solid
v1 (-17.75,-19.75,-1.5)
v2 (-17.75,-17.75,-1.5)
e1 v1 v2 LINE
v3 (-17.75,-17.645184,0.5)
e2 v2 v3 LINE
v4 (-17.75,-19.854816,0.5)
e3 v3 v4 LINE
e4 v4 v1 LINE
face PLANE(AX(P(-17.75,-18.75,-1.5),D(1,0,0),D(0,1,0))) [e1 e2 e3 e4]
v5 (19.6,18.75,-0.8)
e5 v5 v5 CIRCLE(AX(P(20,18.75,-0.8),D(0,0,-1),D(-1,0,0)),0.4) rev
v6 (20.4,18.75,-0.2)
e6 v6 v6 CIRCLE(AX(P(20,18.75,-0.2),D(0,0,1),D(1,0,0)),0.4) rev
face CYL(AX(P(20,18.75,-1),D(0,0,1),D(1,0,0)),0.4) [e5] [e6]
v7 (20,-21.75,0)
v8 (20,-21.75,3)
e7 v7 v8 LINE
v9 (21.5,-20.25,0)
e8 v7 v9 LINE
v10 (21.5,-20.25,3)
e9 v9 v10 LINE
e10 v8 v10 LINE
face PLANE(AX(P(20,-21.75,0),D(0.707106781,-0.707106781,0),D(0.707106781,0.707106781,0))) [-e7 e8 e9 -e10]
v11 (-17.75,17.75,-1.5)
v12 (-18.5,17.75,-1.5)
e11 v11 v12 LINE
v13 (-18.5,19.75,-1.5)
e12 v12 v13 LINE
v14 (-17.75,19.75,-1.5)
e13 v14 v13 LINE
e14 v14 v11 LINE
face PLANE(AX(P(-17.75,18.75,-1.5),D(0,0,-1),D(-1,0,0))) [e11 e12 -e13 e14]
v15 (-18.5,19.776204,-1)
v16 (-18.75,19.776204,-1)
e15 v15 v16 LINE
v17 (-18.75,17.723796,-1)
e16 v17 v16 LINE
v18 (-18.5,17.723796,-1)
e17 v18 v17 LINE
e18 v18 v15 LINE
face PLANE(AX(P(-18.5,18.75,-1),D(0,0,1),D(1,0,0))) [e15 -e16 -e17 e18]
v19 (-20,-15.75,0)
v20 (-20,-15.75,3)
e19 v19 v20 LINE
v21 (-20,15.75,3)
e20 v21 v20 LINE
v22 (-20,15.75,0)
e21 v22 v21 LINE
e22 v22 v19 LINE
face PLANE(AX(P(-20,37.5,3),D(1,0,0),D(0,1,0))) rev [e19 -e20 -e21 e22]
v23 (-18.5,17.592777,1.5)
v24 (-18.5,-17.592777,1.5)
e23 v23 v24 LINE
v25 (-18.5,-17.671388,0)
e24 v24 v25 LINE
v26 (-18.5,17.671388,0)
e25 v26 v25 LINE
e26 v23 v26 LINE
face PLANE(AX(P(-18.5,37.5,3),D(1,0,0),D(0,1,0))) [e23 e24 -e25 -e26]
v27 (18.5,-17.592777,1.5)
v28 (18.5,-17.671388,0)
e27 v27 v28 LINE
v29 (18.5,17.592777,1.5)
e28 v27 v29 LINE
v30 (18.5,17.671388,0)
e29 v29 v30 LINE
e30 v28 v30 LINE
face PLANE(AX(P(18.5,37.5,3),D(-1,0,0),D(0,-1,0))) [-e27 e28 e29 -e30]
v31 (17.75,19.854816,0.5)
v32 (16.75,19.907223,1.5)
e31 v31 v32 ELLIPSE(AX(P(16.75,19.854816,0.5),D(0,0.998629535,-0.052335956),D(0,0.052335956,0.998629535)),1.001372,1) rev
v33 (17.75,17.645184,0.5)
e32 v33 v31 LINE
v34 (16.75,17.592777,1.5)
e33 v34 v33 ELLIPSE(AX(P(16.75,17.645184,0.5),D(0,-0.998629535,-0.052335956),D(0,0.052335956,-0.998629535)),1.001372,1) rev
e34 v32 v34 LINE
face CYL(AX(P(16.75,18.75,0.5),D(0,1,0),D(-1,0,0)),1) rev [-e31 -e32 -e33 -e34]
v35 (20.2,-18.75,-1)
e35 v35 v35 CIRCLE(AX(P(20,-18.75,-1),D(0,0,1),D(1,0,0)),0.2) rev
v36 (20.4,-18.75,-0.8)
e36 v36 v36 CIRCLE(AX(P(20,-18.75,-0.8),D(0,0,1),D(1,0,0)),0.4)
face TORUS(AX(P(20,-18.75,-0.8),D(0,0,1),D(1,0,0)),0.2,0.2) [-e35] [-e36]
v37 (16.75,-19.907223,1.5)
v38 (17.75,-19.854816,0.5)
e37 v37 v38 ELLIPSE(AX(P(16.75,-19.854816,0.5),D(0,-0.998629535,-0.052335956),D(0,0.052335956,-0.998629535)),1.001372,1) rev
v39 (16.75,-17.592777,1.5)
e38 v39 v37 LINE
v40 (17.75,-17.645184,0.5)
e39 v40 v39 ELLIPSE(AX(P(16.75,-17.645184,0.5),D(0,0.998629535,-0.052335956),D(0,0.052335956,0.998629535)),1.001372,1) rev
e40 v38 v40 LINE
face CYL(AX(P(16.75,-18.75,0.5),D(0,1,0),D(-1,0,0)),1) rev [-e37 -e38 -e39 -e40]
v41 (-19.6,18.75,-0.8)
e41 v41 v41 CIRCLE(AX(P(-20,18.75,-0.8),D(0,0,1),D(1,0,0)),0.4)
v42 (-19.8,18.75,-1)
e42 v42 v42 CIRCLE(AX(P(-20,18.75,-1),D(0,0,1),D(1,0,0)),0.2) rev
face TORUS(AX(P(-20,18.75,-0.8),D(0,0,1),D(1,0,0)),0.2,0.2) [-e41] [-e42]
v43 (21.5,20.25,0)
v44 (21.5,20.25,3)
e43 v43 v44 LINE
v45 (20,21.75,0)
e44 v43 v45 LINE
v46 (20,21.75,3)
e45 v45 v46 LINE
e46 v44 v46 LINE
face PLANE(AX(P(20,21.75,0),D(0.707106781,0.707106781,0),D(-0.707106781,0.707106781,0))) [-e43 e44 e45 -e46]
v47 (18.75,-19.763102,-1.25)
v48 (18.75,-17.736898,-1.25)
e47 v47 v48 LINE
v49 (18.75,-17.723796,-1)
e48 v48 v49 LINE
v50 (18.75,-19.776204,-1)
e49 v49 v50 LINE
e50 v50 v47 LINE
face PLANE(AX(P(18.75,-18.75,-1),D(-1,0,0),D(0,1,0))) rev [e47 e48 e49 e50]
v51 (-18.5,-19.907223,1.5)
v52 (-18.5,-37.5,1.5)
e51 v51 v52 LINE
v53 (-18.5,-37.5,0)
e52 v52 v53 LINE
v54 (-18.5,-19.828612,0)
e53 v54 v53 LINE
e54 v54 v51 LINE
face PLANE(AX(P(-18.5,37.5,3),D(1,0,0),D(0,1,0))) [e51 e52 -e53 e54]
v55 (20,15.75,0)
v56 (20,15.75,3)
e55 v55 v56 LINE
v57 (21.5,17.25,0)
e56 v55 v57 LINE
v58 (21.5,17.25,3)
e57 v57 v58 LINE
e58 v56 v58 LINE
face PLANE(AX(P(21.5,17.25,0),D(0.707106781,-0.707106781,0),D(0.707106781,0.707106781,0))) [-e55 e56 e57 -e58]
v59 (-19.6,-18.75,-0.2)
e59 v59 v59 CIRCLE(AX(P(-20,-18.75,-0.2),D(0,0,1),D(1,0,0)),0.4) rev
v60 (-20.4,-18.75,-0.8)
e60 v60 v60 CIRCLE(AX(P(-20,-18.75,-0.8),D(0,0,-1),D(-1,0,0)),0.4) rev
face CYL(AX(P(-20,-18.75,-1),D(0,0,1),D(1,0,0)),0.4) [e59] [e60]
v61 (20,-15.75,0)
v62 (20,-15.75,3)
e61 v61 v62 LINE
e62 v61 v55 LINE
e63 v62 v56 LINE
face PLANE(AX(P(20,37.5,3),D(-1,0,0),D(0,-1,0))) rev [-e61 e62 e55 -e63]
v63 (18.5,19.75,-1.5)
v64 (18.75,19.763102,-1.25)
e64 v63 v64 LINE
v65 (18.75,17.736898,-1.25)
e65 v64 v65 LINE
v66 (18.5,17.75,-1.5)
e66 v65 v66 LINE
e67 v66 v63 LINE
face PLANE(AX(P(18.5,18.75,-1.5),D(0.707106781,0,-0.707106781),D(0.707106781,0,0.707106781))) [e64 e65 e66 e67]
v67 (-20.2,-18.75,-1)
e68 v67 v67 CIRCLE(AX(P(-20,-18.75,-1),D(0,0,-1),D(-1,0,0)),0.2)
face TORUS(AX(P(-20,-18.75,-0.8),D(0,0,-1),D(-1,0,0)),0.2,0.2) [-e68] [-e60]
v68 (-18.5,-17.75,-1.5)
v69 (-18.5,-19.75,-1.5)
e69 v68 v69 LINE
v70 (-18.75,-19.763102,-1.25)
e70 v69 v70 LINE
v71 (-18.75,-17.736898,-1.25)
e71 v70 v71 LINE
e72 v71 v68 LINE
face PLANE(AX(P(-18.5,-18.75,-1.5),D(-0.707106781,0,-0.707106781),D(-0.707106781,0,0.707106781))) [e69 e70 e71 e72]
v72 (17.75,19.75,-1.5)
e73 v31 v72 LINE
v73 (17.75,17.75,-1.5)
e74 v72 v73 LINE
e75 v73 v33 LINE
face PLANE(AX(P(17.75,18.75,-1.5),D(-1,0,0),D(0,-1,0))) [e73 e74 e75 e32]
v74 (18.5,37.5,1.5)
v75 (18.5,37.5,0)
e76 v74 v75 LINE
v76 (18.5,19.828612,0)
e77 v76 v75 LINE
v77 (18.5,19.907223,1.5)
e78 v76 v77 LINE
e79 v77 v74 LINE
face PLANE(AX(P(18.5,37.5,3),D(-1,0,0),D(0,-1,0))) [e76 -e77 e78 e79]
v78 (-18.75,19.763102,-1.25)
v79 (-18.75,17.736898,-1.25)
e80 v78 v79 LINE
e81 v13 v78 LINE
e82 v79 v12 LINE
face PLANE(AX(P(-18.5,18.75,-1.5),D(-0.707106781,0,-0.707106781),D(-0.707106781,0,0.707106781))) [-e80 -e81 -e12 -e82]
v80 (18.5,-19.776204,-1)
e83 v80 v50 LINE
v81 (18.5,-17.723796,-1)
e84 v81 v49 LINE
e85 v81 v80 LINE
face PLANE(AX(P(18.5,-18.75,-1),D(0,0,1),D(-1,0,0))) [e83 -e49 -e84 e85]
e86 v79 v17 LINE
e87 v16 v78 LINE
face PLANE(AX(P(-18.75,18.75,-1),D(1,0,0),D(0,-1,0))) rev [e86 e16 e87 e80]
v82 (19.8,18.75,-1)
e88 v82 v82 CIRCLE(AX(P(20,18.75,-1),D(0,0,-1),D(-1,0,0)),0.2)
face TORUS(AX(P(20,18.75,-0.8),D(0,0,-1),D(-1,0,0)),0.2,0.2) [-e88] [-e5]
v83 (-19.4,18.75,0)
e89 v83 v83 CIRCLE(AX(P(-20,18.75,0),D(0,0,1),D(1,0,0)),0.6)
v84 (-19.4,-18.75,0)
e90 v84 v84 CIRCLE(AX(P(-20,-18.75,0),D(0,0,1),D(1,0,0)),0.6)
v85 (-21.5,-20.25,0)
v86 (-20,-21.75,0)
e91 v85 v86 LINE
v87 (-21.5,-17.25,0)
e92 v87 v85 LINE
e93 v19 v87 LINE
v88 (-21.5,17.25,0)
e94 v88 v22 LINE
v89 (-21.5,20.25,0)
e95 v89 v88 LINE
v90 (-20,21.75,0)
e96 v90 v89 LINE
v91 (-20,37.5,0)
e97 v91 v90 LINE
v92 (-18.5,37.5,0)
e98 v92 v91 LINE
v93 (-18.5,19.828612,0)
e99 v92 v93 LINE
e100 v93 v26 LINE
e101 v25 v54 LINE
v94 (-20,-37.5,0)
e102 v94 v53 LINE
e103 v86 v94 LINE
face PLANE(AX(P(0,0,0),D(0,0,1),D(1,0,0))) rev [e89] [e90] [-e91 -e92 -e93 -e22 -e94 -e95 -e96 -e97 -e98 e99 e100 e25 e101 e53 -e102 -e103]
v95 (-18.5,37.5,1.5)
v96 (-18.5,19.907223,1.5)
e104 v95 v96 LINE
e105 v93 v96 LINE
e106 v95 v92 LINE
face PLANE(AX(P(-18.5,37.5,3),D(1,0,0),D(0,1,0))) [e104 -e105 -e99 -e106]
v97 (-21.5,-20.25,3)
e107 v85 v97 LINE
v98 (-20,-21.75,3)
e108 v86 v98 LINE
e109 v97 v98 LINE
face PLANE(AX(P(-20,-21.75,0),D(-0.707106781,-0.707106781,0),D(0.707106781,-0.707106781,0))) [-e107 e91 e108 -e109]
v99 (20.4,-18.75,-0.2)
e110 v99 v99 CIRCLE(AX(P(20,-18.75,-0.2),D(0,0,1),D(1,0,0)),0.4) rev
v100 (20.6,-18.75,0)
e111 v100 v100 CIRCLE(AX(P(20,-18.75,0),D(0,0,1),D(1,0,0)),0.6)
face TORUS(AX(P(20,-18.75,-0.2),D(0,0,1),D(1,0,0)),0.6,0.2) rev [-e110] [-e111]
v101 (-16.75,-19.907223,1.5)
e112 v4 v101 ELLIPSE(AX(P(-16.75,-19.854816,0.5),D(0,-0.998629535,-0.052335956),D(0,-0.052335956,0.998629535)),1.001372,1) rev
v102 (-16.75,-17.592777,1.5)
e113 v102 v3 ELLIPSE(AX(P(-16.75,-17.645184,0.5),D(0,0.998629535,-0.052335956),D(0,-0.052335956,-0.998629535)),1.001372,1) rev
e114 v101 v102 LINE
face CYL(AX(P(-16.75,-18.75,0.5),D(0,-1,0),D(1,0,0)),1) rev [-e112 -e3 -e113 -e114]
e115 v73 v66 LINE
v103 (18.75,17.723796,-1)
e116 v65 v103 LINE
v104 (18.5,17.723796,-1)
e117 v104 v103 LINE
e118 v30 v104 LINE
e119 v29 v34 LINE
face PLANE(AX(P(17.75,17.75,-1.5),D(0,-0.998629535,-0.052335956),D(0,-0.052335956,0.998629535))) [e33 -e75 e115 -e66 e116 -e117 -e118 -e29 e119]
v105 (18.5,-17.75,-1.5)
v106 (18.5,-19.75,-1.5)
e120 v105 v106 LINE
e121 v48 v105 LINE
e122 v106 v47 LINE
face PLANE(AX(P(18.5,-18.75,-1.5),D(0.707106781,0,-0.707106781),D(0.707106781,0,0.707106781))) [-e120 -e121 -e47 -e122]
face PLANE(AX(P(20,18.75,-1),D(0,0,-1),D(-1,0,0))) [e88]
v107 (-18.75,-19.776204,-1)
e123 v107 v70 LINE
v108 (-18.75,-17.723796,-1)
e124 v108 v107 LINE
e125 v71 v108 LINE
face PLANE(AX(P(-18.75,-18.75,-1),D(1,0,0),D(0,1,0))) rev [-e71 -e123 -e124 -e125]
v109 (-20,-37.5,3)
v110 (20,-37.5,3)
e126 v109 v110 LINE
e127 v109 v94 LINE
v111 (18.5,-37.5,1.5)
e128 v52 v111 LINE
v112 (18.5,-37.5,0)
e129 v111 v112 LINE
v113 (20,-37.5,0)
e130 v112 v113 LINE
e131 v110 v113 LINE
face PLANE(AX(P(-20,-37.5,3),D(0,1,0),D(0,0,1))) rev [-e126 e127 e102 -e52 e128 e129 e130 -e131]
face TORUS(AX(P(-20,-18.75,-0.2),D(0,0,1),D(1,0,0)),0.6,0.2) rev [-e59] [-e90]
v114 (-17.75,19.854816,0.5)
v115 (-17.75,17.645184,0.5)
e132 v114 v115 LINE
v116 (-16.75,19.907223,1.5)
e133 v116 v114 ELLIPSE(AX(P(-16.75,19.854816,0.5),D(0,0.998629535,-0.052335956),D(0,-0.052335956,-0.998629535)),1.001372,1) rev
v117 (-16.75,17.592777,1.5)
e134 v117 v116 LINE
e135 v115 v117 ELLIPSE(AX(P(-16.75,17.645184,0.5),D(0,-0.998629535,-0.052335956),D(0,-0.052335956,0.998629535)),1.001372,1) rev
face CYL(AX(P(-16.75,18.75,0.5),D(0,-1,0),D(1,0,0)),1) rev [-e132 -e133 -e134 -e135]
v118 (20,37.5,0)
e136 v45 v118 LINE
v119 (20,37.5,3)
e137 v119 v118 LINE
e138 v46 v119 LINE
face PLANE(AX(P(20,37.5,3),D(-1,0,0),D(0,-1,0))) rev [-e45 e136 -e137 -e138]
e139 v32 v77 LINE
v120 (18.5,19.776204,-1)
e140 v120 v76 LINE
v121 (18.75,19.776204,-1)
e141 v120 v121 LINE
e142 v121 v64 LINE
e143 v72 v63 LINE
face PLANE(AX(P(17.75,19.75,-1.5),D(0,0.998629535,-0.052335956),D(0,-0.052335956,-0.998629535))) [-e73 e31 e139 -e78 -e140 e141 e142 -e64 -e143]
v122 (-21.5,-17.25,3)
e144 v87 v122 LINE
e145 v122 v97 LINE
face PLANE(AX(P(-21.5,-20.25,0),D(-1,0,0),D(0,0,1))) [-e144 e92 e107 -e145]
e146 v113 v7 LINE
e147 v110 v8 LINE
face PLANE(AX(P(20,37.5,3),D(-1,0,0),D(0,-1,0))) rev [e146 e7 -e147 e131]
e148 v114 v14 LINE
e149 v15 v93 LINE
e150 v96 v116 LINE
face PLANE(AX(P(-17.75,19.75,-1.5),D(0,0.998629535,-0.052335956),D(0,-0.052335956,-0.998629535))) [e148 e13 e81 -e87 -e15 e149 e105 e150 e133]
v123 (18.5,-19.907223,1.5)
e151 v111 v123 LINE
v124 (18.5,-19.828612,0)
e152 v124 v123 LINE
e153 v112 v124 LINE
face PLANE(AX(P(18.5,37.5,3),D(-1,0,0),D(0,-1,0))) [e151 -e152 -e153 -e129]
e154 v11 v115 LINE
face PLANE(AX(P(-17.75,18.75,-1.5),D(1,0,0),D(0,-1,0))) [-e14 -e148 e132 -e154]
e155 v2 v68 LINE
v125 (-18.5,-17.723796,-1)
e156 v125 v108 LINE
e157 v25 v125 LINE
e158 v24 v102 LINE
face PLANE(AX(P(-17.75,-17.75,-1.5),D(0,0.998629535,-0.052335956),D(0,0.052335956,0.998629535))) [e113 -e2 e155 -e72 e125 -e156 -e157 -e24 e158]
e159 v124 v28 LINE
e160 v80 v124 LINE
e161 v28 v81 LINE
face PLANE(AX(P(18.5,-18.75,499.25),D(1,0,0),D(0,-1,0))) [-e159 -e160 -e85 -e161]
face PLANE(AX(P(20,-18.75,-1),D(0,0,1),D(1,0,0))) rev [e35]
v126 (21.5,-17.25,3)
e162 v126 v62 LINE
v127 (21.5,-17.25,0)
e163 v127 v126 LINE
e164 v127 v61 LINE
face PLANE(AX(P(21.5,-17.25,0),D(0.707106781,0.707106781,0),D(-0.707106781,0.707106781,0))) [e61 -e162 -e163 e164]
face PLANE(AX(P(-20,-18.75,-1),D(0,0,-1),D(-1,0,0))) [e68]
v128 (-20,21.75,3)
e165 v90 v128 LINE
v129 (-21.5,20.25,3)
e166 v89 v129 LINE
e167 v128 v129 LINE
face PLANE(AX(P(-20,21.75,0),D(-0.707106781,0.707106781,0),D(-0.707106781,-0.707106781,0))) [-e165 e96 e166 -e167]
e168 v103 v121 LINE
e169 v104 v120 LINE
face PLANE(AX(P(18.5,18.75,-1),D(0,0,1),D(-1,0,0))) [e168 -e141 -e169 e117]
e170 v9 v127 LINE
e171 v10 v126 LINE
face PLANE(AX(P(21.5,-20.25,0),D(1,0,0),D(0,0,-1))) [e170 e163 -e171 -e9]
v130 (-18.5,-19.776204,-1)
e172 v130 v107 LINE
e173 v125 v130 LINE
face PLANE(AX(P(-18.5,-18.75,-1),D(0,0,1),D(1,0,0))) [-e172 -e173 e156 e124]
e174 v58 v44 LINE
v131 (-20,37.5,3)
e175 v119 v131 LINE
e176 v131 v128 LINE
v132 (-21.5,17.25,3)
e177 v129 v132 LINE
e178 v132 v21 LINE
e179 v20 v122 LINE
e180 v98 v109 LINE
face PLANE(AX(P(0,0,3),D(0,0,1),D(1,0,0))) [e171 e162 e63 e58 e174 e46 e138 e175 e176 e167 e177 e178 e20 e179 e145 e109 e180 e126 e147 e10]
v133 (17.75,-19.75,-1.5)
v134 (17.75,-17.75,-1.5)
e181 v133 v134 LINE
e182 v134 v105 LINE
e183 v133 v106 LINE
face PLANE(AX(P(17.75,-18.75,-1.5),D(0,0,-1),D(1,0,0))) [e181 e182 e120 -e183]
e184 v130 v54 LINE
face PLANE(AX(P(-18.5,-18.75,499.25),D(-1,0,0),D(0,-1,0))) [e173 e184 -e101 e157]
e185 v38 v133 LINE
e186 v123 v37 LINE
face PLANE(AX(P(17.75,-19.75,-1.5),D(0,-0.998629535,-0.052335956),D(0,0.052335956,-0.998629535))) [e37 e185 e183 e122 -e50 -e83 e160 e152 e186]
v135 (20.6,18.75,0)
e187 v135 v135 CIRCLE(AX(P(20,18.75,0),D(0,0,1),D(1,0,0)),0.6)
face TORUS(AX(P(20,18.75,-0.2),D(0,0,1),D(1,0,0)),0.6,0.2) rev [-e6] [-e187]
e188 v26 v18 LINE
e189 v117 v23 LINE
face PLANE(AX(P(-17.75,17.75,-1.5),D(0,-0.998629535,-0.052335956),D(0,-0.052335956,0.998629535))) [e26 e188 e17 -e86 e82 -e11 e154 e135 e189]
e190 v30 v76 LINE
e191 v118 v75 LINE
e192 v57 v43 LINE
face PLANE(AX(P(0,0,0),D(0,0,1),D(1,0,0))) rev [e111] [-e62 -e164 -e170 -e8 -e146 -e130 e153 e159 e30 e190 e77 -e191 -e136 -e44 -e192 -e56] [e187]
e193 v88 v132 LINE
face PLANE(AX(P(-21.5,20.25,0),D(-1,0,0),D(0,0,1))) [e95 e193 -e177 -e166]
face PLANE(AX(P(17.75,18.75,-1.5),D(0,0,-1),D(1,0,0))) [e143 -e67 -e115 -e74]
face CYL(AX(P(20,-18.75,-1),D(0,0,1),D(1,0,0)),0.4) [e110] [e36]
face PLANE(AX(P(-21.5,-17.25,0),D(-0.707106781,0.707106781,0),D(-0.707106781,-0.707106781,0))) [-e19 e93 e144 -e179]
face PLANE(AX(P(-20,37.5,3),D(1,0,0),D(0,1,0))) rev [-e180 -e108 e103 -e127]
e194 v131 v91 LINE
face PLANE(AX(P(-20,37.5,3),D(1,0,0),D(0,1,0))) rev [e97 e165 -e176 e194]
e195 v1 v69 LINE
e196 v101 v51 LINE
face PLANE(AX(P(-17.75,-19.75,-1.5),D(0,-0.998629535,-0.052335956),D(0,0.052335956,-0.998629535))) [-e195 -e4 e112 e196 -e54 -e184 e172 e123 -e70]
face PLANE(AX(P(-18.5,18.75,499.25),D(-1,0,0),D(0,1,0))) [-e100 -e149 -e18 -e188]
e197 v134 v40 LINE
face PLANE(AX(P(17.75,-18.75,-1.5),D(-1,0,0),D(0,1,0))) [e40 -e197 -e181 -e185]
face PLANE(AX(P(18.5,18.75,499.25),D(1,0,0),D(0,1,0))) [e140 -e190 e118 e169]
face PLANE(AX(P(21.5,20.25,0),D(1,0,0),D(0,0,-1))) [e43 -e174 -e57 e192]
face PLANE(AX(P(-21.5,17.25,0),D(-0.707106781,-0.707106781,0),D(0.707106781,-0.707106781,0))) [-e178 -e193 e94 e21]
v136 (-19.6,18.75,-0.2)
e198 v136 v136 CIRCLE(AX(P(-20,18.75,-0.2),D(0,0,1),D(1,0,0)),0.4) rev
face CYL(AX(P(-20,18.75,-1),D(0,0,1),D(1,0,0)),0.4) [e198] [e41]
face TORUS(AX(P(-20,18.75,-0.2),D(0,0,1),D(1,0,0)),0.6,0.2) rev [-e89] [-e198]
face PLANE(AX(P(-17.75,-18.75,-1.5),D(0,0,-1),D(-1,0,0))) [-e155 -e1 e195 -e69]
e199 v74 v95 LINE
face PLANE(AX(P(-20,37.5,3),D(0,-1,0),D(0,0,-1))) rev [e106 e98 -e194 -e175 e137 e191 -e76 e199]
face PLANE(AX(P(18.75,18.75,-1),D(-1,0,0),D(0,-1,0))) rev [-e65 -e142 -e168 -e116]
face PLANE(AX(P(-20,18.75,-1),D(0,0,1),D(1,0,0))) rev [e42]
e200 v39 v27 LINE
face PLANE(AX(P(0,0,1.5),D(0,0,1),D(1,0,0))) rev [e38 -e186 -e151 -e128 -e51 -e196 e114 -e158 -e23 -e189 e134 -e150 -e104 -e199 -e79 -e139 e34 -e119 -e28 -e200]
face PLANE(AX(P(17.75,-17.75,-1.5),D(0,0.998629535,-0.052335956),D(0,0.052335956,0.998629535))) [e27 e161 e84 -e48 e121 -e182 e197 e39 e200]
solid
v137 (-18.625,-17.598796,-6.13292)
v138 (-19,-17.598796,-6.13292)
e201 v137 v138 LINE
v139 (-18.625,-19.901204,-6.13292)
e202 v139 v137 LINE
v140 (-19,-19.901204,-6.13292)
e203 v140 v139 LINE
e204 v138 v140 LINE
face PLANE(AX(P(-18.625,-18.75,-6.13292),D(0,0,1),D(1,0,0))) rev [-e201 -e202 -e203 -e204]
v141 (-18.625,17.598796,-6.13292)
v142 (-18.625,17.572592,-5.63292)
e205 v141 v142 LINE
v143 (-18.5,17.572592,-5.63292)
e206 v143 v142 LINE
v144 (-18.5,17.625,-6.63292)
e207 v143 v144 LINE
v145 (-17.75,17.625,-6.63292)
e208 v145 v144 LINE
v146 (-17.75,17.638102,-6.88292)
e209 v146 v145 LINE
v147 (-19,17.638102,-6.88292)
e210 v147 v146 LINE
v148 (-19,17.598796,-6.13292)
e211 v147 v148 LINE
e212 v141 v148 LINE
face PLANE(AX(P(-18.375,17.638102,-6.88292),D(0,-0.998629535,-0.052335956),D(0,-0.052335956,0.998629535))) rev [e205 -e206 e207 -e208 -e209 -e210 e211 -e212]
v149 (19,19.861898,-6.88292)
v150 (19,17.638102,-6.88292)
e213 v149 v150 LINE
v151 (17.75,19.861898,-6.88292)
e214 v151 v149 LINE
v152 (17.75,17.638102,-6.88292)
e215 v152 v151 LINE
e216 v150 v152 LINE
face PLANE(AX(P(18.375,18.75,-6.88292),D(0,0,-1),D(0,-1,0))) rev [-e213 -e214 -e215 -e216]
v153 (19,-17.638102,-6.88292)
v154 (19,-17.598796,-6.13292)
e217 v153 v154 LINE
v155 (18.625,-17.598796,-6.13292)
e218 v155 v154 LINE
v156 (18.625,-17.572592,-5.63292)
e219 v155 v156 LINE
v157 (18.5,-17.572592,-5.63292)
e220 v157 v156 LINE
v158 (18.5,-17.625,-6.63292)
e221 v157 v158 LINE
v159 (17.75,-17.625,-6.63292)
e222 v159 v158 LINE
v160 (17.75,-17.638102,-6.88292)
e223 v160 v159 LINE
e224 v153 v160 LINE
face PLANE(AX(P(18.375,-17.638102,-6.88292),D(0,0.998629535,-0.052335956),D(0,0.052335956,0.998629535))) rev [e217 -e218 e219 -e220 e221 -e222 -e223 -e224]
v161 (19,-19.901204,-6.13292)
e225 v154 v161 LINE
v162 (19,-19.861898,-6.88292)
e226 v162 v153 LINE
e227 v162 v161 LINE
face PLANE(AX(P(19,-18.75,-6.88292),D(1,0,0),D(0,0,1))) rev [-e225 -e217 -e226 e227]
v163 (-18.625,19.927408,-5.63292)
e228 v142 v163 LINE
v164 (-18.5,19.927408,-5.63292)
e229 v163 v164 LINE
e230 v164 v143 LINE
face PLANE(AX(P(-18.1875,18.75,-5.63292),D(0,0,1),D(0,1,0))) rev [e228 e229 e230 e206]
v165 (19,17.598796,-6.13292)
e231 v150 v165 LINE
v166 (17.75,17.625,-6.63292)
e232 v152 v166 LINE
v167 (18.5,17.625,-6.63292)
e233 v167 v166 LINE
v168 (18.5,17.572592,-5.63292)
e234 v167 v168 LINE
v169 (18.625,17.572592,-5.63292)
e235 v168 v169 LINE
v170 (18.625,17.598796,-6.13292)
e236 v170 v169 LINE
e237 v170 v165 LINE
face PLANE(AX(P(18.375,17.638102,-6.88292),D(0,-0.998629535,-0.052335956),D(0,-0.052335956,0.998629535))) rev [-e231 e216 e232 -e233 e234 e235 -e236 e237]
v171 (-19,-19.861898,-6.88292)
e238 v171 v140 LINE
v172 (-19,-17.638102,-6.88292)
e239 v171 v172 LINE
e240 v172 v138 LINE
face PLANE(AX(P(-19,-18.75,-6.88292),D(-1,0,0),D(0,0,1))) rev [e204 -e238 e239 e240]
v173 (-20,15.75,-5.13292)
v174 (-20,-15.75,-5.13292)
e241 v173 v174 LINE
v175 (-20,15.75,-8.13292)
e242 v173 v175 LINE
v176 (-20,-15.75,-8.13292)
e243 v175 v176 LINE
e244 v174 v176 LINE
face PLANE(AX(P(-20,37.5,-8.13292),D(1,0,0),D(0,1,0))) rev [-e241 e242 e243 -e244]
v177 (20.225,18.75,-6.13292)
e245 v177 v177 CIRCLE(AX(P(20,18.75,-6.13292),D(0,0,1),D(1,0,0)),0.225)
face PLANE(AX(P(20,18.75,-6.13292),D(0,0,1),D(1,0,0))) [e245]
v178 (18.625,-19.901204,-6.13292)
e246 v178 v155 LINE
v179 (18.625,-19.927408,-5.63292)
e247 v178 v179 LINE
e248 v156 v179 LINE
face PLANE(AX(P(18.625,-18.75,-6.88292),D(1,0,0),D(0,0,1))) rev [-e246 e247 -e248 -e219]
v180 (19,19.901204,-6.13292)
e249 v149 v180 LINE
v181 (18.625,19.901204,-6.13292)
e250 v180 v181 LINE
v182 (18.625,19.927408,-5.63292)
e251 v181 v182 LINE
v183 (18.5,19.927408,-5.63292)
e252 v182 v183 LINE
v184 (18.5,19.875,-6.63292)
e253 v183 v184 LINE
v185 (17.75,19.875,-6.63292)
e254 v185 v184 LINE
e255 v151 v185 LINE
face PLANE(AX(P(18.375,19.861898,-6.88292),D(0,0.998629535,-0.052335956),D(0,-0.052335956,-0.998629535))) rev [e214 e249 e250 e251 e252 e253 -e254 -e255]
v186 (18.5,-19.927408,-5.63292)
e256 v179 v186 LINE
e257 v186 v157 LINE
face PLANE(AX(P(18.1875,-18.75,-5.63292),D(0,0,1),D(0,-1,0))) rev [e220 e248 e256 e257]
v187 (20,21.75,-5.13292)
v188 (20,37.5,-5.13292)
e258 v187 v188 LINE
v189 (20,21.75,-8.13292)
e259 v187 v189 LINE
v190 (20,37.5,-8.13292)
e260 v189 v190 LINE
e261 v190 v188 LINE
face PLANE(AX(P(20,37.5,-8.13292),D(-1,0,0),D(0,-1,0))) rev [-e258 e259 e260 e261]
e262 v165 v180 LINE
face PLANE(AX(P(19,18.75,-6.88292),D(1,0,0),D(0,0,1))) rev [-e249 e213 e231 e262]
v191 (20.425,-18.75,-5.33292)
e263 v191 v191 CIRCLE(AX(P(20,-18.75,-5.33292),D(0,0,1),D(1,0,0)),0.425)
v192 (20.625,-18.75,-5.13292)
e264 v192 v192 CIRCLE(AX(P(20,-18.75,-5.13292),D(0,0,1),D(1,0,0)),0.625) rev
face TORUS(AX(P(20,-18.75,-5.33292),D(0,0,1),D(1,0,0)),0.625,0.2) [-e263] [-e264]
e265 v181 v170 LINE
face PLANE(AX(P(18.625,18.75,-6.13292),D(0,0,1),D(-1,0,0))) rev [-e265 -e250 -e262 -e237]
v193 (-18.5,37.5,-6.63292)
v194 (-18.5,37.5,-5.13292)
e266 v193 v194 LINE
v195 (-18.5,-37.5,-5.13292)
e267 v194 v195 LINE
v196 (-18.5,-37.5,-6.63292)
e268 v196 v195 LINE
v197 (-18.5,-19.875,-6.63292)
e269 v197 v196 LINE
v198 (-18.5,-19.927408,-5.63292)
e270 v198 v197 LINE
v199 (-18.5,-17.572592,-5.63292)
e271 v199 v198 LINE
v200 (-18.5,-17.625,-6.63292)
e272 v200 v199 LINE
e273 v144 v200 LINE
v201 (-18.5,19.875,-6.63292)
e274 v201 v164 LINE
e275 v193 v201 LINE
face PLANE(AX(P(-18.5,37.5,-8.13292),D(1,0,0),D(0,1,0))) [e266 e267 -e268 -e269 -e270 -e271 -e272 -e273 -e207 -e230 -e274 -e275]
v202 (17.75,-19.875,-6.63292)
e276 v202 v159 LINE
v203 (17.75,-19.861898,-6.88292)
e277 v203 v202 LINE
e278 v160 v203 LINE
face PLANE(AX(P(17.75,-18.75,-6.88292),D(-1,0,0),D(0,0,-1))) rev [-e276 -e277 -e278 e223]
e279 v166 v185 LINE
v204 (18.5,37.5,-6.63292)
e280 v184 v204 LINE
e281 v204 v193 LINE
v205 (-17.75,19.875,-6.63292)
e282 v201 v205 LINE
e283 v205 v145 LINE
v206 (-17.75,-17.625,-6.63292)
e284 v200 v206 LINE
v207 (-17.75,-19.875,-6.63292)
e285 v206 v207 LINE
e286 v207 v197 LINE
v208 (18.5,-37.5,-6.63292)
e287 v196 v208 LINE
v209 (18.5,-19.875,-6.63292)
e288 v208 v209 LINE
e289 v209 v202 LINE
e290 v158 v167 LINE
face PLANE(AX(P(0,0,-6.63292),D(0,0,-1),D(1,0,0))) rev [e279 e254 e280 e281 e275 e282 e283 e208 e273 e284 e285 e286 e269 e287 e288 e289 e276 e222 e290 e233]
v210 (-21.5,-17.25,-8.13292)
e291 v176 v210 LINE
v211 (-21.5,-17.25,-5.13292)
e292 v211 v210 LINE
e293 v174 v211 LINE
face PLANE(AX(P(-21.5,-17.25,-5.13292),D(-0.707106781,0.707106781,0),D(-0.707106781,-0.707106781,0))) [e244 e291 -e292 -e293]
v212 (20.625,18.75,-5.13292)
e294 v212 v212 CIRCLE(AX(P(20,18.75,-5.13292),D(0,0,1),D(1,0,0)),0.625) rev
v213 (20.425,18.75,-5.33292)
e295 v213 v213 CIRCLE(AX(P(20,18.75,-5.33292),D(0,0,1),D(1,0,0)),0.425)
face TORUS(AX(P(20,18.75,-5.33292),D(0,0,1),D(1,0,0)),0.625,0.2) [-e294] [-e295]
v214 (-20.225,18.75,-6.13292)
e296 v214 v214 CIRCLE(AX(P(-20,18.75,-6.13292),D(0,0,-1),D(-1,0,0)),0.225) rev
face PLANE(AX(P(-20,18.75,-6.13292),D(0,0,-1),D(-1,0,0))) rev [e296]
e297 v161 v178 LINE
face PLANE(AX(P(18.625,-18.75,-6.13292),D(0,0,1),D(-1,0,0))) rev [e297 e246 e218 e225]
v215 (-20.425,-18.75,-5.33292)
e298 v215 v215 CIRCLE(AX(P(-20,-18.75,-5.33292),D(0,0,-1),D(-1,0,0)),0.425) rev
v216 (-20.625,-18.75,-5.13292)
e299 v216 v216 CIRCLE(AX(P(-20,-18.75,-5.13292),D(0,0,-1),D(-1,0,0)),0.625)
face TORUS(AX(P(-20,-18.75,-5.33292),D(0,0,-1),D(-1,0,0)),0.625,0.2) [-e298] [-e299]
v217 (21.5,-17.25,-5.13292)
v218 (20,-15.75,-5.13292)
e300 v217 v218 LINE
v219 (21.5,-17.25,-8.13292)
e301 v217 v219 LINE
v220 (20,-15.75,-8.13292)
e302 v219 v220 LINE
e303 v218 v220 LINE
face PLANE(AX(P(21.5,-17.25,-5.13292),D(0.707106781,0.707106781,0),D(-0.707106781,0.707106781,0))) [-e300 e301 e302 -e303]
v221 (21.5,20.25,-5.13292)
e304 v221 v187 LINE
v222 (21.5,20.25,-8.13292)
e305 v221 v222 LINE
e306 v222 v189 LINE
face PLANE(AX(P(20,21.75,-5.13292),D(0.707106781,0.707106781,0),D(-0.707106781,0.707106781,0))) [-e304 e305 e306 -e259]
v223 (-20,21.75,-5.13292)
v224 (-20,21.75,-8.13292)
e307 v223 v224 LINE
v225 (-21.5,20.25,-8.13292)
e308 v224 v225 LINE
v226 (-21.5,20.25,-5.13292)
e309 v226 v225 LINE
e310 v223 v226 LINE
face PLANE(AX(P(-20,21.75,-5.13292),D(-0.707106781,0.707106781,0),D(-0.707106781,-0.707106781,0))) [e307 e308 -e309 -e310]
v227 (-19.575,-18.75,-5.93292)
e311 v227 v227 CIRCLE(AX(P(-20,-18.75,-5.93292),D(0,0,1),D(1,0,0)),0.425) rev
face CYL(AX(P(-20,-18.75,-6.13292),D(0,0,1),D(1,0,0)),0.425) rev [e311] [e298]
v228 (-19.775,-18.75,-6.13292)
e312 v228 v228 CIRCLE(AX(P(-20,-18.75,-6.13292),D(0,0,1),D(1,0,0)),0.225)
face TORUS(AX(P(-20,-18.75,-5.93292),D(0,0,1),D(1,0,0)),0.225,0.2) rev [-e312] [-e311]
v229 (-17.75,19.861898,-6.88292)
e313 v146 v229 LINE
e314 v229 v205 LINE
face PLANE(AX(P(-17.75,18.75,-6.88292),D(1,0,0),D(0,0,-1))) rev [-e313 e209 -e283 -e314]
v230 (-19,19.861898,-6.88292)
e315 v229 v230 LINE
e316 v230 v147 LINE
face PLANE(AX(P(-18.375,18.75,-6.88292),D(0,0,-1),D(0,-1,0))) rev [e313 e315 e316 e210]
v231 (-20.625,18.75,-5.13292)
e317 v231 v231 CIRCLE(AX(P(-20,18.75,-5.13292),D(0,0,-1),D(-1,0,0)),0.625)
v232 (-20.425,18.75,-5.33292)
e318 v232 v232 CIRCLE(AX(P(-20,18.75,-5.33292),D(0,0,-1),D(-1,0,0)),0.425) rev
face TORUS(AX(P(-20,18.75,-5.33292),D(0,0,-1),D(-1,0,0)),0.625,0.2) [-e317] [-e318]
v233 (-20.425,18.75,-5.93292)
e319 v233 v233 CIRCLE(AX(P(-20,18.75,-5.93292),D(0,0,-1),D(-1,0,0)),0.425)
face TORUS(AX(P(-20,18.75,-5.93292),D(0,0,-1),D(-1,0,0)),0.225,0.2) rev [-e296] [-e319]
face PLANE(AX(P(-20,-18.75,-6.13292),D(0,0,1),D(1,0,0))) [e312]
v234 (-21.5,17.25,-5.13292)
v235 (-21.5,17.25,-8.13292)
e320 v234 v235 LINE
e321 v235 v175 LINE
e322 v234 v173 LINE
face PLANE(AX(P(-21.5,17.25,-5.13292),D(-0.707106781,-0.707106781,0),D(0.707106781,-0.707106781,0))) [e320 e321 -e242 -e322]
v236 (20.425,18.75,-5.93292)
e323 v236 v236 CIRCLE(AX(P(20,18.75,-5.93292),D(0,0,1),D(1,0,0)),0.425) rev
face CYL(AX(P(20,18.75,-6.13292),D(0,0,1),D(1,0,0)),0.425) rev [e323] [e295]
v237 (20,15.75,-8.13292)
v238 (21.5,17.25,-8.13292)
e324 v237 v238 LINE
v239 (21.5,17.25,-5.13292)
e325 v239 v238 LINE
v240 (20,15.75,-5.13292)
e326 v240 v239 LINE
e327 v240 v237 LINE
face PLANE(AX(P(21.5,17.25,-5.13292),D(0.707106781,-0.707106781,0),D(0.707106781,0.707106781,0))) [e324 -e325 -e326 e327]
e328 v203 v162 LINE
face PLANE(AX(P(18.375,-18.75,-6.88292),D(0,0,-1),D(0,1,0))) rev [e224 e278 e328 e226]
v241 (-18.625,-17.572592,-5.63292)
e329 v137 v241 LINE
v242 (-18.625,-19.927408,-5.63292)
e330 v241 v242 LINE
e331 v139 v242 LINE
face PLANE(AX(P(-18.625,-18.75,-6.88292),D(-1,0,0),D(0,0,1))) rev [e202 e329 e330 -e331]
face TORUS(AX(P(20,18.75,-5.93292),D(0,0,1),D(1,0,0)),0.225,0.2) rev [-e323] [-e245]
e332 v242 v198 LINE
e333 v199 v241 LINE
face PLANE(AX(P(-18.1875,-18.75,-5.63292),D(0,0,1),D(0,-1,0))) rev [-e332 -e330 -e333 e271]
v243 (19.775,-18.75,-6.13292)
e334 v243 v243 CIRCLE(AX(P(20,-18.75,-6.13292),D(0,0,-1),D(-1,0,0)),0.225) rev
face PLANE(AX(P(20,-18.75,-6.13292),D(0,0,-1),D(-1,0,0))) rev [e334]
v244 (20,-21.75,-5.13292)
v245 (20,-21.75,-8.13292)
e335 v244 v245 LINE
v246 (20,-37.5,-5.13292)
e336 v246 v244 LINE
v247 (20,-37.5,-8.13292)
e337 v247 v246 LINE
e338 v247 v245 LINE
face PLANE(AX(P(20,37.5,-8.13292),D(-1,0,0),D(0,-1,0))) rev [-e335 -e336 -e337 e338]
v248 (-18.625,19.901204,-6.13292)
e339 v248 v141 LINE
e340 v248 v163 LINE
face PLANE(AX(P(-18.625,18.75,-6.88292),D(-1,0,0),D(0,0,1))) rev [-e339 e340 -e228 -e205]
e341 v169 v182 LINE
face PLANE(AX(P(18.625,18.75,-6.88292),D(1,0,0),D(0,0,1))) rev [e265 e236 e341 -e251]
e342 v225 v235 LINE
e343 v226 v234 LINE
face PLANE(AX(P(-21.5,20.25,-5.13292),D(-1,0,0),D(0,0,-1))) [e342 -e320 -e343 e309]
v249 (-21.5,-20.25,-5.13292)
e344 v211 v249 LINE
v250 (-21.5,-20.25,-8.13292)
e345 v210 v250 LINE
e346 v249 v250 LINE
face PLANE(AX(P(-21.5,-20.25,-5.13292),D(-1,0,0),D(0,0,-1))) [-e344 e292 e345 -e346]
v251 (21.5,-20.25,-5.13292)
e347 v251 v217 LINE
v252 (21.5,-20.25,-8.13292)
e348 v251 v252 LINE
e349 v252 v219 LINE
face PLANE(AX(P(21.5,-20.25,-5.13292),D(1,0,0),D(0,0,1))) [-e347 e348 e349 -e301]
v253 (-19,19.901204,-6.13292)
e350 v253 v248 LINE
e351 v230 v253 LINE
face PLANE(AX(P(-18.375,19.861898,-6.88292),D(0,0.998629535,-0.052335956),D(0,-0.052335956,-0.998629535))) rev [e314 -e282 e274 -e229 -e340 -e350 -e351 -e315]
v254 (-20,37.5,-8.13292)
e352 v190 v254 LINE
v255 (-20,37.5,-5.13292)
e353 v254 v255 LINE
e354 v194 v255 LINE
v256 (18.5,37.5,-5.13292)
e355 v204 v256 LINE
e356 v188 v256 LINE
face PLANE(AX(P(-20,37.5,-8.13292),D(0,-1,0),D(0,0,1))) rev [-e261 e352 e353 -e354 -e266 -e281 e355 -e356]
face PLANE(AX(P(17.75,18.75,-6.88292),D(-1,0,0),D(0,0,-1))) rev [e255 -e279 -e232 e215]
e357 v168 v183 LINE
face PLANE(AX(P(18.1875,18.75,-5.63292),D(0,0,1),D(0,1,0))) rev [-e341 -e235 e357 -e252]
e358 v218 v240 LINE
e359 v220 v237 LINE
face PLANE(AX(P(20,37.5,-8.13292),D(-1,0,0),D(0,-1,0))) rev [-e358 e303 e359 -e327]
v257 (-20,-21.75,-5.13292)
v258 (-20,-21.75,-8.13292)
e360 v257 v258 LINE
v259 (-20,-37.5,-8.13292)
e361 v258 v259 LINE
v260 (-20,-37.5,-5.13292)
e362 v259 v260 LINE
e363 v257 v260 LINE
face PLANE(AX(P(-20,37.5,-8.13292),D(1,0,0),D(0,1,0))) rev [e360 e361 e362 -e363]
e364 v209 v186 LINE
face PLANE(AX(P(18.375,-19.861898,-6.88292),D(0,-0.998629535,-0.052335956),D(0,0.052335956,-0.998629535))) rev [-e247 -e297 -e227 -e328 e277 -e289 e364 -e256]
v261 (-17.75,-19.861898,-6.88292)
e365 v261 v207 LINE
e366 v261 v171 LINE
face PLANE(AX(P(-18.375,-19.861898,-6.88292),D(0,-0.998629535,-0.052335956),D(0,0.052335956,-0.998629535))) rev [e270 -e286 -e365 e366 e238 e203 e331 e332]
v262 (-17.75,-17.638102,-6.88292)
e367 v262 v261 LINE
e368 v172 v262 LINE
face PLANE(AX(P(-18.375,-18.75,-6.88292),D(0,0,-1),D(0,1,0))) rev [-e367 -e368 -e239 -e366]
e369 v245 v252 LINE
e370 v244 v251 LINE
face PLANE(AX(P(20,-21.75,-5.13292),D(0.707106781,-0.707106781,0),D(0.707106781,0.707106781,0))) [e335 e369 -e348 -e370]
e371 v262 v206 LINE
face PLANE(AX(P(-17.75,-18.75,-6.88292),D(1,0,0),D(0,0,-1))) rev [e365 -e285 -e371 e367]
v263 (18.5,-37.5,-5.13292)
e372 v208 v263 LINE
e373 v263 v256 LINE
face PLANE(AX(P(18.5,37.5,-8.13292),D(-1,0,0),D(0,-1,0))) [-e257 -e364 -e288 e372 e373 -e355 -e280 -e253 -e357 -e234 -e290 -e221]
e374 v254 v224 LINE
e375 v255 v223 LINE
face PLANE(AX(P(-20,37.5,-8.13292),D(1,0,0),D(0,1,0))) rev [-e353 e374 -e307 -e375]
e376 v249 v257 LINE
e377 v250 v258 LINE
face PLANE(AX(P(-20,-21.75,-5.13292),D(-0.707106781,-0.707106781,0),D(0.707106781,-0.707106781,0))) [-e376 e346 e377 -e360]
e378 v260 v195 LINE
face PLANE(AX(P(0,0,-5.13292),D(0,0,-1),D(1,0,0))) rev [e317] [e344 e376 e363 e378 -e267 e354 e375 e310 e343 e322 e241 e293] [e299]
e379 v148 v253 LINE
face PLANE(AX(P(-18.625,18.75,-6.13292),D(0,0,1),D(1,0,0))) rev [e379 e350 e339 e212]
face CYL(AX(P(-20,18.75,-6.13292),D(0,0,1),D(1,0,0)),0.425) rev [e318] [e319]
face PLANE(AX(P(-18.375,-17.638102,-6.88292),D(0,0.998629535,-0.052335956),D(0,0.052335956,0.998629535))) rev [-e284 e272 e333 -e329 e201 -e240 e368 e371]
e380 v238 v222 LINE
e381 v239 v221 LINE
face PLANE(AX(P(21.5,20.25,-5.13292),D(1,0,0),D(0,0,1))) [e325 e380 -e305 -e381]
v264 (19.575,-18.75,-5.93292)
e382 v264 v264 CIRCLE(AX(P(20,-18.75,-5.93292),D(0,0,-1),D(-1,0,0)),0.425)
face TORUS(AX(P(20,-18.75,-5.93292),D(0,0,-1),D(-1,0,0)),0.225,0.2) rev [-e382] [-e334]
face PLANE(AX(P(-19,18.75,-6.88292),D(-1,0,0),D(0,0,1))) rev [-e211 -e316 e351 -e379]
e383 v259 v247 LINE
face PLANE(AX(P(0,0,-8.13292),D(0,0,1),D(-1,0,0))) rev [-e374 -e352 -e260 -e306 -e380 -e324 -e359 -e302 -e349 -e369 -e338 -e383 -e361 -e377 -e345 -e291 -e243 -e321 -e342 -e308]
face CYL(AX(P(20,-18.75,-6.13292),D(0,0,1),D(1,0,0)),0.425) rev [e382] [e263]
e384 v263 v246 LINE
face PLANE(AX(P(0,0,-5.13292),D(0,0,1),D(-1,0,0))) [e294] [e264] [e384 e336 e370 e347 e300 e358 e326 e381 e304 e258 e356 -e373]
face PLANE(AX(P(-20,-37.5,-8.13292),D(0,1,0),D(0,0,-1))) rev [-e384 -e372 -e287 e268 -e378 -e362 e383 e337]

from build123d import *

# Parameters (mm, degrees)
SKETCH1_W             = 40
SKETCH1_H             = 75
BOSS_EXTRUDE1_DEPTH   = 3
SHELL2_T              = -1.5
SNAP_START            = 17.75
SNAP_HOOK1_DEPTH      = 0.75
SNAP_HOOK1_2_DEPTH    = 0.75
SNAP_GROOVE1_DEPTH    = 1.25
SNAP_GROOVE1_2_DEPTH  = 0.875
MIRROR8_START         = -18.5
MIRROR8_DEPTH         = 0.75
MIRROR8_START_2       = 17.75
MIRROR8_2_DEPTH       = 0.75
MIRROR8_3_DEPTH       = 0.75
MIRROR8_4_DEPTH       = 0.75
MIRROR9_START         = 17.75
MIRROR9_COPY_1_DEPTH  = 1.25
MIRROR9_COPY_2_DEPTH  = 0.875
FILLET1_R             = 1
BOSS_EXTRUDE3_DEPTH   = 3
BOSS_EXTRUDE3_2_DEPTH = 3
BOSS_EXTRUDE3_3_DEPTH = 3
BOSS_EXTRUDE3_4_DEPTH = 3
SKETCH6_R             = 0.4
BOSS_EXTRUDE4_DEPTH   = 1
FILLET2_R             = 0.2
SKETCH7_R             = 0.425
CUT_EXTRUDE1_DEPTH    = 1
FILLET3_R             = 0.2


with BuildPart() as part:
    # Sketch1 → Boss-Extrude1 (new body)
    with BuildSketch(Plane.XY):
        Rectangle(SKETCH1_W, SKETCH1_H)
    extrude(amount=BOSS_EXTRUDE1_DEPTH)

    # Shell2
    shell2_openings = [part.faces().sort_by_distance(p)[0] for p in [
        (0, 0, 0),
        (0, -37.5, 1.5),
        (0, 37.5, 1.5),
    ]]
    offset(amount=SHELL2_T, openings=shell2_openings, kind=Kind.INTERSECTION)


with BuildPart() as body_2:
    # Mirror3: mirrored copy
    add(part.part.mirror(Plane.XY))

    # Snap Groove1: read off the stored shape, not the designer's step
    # Snap Groove1 outline → Snap Groove1 (cut)
    with BuildSketch(Plane.YZ.offset(SNAP_START)):
        Polygon((19.861898055, -1.75), (19.901203889, -1), (17.59879611, -1), (17.638101945, -1.75), align=None)
    snap_groove1 = extrude(amount=SNAP_GROOVE1_DEPTH, mode=Mode.SUBTRACT)

    # Snap Groove1 2 outline → Snap Groove1 2 (cut)
    with BuildSketch(Plane.YZ.offset(SNAP_START)):
        Polygon((17.59879611, -1), (19.90120389, -1), (19.927407779, -0.5), (17.572592221, -0.5), align=None)
    snap_groove1_2 = extrude(amount=SNAP_GROOVE1_2_DEPTH, mode=Mode.SUBTRACT)

    # Mirror7: Snap Groove1, Snap Groove1 2 across plane
    add(snap_groove1.mirror(Plane(origin=(0, 0, 0), x_dir=(0, 0, 1), z_dir=(1, 0, 0))), mode=Mode.SUBTRACT)
    add(snap_groove1_2.mirror(Plane(origin=(0, 0, 0), x_dir=(0, 0, 1), z_dir=(1, 0, 0))), mode=Mode.SUBTRACT)

    # Mirror9: Snap Groove1, Snap Groove1 2 across plane
    add(snap_groove1.mirror(Plane.ZX), mode=Mode.SUBTRACT)
    add(snap_groove1_2.mirror(Plane.ZX), mode=Mode.SUBTRACT)

    # Mirror9 copy 1 sketch → Mirror9 copy 1 (cut)
    with BuildSketch(Plane(origin=(0, 0, 0), x_dir=(0, -1, 0), z_dir=(-1, 0, 0)).offset(MIRROR9_START)):
        Polygon((19.861898055, -1.75), (19.901203889, -1), (17.59879611, -1), (17.638101945, -1.75), align=None)
    extrude(amount=MIRROR9_COPY_1_DEPTH, mode=Mode.SUBTRACT)

    # Mirror9 copy 2 sketch → Mirror9 copy 2 (cut)
    with BuildSketch(Plane(origin=(0, 0, 0), x_dir=(0, -1, 0), z_dir=(-1, 0, 0)).offset(MIRROR9_START)):
        Polygon((17.59879611, -1), (19.90120389, -1), (19.927407779, -0.5), (17.572592221, -0.5), align=None)
    extrude(amount=MIRROR9_COPY_2_DEPTH, mode=Mode.SUBTRACT)


with BuildPart() as part_1:
    add(part.part)

    # Snap Hook1: read off the stored shape, not the designer's step
    # Snap Hook1 outline → Snap Hook1 (add)
    with BuildSketch(Plane.YZ.offset(SNAP_START)):
        Polygon((17.72379611, -1), (17.75, -1.5), (19.75, -1.5), (19.77620389, -1), align=None)
    snap_hook1 = extrude(amount=SNAP_HOOK1_DEPTH)

    # Snap Hook1 2 outline → Snap Hook1 2 (add)
    with BuildSketch(Plane.YZ.offset(SNAP_START)):
        Polygon((17.72379611, -1), (19.77620389, -1), (19.907223338, 1.5), (17.592776662, 1.5), align=None)
    snap_hook1_2 = extrude(amount=SNAP_HOOK1_2_DEPTH)

    # Snap Hook1 3: loft between two sections, ruled curve by curve
    snap_hook1_3_from = [
        Edge.make_line((18.5, 17.75, -1.5), (18.5, 19.75, -1.5)),
        Edge.make_line((18.5, 19.77620389, -1), (18.5, 17.72379611, -1)),
        Edge.make_line((18.5, 19.77620389, -1), (18.5, 19.75, -1.5)),
        Edge.make_line((18.5, 17.72379611, -1), (18.5, 17.75, -1.5)),
    ]
    snap_hook1_3_to = [
        Edge.make_line((18.75, 17.736898055, -1.25), (18.75, 19.763101945, -1.25)),
        Edge.make_line((18.75, 19.77620389, -1), (18.75, 17.72379611, -1)),
        Edge.make_line((18.75, 19.77620389, -1), (18.75, 19.763101945, -1.25)),
        Edge.make_line((18.75, 17.72379611, -1), (18.75, 17.736898055, -1.25)),
    ]
    snap_hook1_3 = Solid(Shell([*[Face.make_surface_from_curves(snap_hook1_3_from[k], snap_hook1_3_to[k]) for k in range(4)], Face(Wire(snap_hook1_3_from)), Face(Wire(snap_hook1_3_to))]))
    add(snap_hook1_3)

    # Mirror6: Snap Hook1, Snap Hook1 2, Snap Hook1 3 across plane
    add(snap_hook1.mirror(Plane(origin=(0, 0, 0), x_dir=(0, 0, 1), z_dir=(1, 0, 0))))
    add(snap_hook1_2.mirror(Plane(origin=(0, 0, 0), x_dir=(0, 0, 1), z_dir=(1, 0, 0))))
    add(snap_hook1_3.mirror(Plane(origin=(0, 0, 0), x_dir=(0, 0, 1), z_dir=(1, 0, 0))))

    # Mirror8: read off the stored shape, not the designer's step
    # Mirror8 outline → Mirror8 (add)
    with BuildSketch(Plane.YZ.offset(MIRROR8_START)):
        Polygon((-19.77620389, -1), (-19.75, -1.5), (-17.75, -1.5), (-17.72379611, -1), align=None)
    extrude(amount=MIRROR8_DEPTH)

    # Mirror8 2 outline → Mirror8 2 (add)
    with BuildSketch(Plane.YZ.offset(MIRROR8_START_2)):
        Polygon((-19.77620389, -1), (-19.75, -1.5), (-17.75, -1.5), (-17.72379611, -1), align=None)
    extrude(amount=MIRROR8_2_DEPTH)

    # Mirror8 3 outline → Mirror8 3 (add)
    with BuildSketch(Plane.YZ.offset(MIRROR8_START)):
        Polygon((-19.77620389, -1), (-17.72379611, -1), (-17.592776662, 1.5), (-19.907223338, 1.5), align=None)
    extrude(amount=MIRROR8_3_DEPTH)

    # Mirror8 4 outline → Mirror8 4 (add)
    with BuildSketch(Plane.YZ.offset(MIRROR8_START_2)):
        Polygon((-19.77620389, -1), (-17.72379611, -1), (-17.592776662, 1.5), (-19.907223338, 1.5), align=None)
    extrude(amount=MIRROR8_4_DEPTH)

    # Mirror8 5: loft between two sections, ruled curve by curve
    mirror8_5_from = [
        Edge.make_line((18.5, -19.75, -1.5), (18.5, -17.75, -1.5)),
        Edge.make_line((18.5, -17.72379611, -1), (18.5, -19.77620389, -1)),
        Edge.make_line((18.5, -17.72379611, -1), (18.5, -17.75, -1.5)),
        Edge.make_line((18.5, -19.77620389, -1), (18.5, -19.75, -1.5)),
    ]
    mirror8_5_to = [
        Edge.make_line((18.75, -19.763101945, -1.25), (18.75, -17.736898055, -1.25)),
        Edge.make_line((18.75, -17.72379611, -1), (18.75, -19.77620389, -1)),
        Edge.make_line((18.75, -17.72379611, -1), (18.75, -17.736898055, -1.25)),
        Edge.make_line((18.75, -19.77620389, -1), (18.75, -19.763101945, -1.25)),
    ]
    mirror8_5 = Solid(Shell([*[Face.make_surface_from_curves(mirror8_5_from[k], mirror8_5_to[k]) for k in range(4)], Face(Wire(mirror8_5_from)), Face(Wire(mirror8_5_to))]))
    add(mirror8_5)

    # Mirror8 6: loft between two sections, ruled curve by curve
    mirror8_6_from = [
        Edge.make_line((-18.75, -17.72379611, -1), (-18.75, -19.77620389, -1)),
        Edge.make_line((-18.75, -19.763101945, -1.25), (-18.75, -17.736898055, -1.25)),
        Edge.make_line((-18.75, -19.763101945, -1.25), (-18.75, -19.77620389, -1)),
        Edge.make_line((-18.75, -17.736898055, -1.25), (-18.75, -17.72379611, -1)),
    ]
    mirror8_6_to = [
        Edge.make_line((-18.5, -17.72379611, -1), (-18.5, -19.77620389, -1)),
        Edge.make_line((-18.5, -19.75, -1.5), (-18.5, -17.75, -1.5)),
        Edge.make_line((-18.5, -19.75, -1.5), (-18.5, -19.77620389, -1)),
        Edge.make_line((-18.5, -17.75, -1.5), (-18.5, -17.72379611, -1)),
    ]
    mirror8_6 = Solid(Shell([*[Face.make_surface_from_curves(mirror8_6_from[k], mirror8_6_to[k]) for k in range(4)], Face(Wire(mirror8_6_from)), Face(Wire(mirror8_6_to))]))
    add(mirror8_6)

    # Fillet1
    fillet1_edges = [part_1.edges().sort_by_distance(p)[0] for p in [
        (-17.75, -18.75, 1.5),
        (17.75, 18.75, 1.5),
        (-17.75, 18.75, 1.5),
        (17.75, -18.75, 1.5),
    ]]
    fillet(fillet1_edges, radius=FILLET1_R)


with BuildPart() as body_3:
    # Sketch5 → Boss-Extrude3 (new body)
    with BuildSketch(Plane.XY.offset(3)):
        Polygon((20, 21.75), (21.5, 20.25), (21.5, 17.25), (20, 15.75), align=None)
    extrude(amount=-BOSS_EXTRUDE3_DEPTH)


with BuildPart() as body_4:
    # Sketch5 → Boss-Extrude3 2 (new body)
    with BuildSketch(Plane.XY.offset(3)):
        Polygon((-21.5, 17.25), (-20, 15.75), (-20, 21.75), (-21.5, 20.25), align=None)
    extrude(amount=-BOSS_EXTRUDE3_2_DEPTH)


with BuildPart() as body_5:
    # Sketch5 → Boss-Extrude3 3 (new body)
    with BuildSketch(Plane.XY.offset(3)):
        Polygon((21.5, -17.25), (20, -15.75), (20, -21.75), (21.5, -20.25), align=None)
    extrude(amount=-BOSS_EXTRUDE3_3_DEPTH)


with BuildPart() as body_6:
    # Sketch5 → Boss-Extrude3 4 (new body)
    with BuildSketch(Plane.XY.offset(3)):
        Polygon((-21.5, -20.25), (-21.5, -17.25), (-20, -15.75), (-20, -21.75), align=None)
    extrude(amount=-BOSS_EXTRUDE3_4_DEPTH)


with BuildPart() as body_7:
    # Mirror10: mirrored copy
    add(body_3.part.mirror(Plane.XY))


with BuildPart() as body_8:
    # Mirror10 2: mirrored copy
    add(body_4.part.mirror(Plane.XY))


with BuildPart() as body_9:
    # Mirror10 3: mirrored copy
    add(body_5.part.mirror(Plane.XY))


with BuildPart() as body_10:
    # Mirror10 4: mirrored copy
    add(body_6.part.mirror(Plane.XY))


with BuildPart() as part_2:
    add(part_1.part)

    # Combine2: union body 4, body 5, body 6, body 3
    add(body_4.part)
    add(body_5.part)
    add(body_6.part)
    add(body_3.part)

    # Sketch6 → Boss-Extrude4 (add)
    with BuildSketch(Plane(origin=(0, 0, 0), x_dir=(-1, 0, 0), z_dir=(0, 0, -1))):
        with Locations(Location((-20, 18.75, 0), (0, 0, 180))):
            Circle(SKETCH6_R)
        with Locations(Location((-20, -18.75, 0), (0, 0, 180))):
            Circle(SKETCH6_R)
        with Locations(Location((20, -18.75, 0), (0, 0, 180))):
            Circle(SKETCH6_R)
        with Locations(Location((20, 18.75, 0), (0, 0, 180))):
            Circle(SKETCH6_R)
    extrude(amount=BOSS_EXTRUDE4_DEPTH)

    # Fillet2
    fillet2_edges = [part_2.edges().sort_by_distance(p)[0] for p in [
        (-20.4, -18.75, 0),
        (-20.4, 18.75, 0),
        (19.6, 18.75, 0),
        (19.6, -18.75, 0),
        (-20.4, 18.75, -1),
        (-20.4, -18.75, -1),
        (19.6, -18.75, -1),
        (19.6, 18.75, -1),
    ]]
    fillet(fillet2_edges, radius=FILLET2_R)


with BuildPart() as body_7_1:
    add(body_7.part)

    # Combine3: union body 8, body 9, body 10, body 2
    add(body_8.part)
    add(body_9.part)
    add(body_10.part)
    add(body_2.part)


with BuildPart() as body_7_2:
    # Body-Move/Copy1: moved
    add(body_7_1.part.moved(Location((0, 0, -5.132920163))))

    # Sketch7 → Cut-Extrude1 (cut)
    with BuildSketch(Plane.XY.offset(-5.132920163)):
        with Locations((-20, -18.75)):
            Circle(SKETCH7_R)
        with Locations(Location((-20, 18.75, 0), (0, 0, 180))):
            Circle(SKETCH7_R)
        with Locations((20, 18.75)):
            Circle(SKETCH7_R)
        with Locations(Location((20, -18.75, 0), (0, 0, 180))):
            Circle(SKETCH7_R)
    extrude(amount=-CUT_EXTRUDE1_DEPTH, mode=Mode.SUBTRACT)

    # Fillet3
    fillet3_edges = [body_7_2.edges().sort_by_distance(p)[0] for p in [
        (20.425, -18.75, -6.132920163),
        (20.425, -18.75, -5.132920163),
        (19.575, 18.75, -6.132920163),
        (19.575, 18.75, -5.132920163),
        (-19.575, 18.75, -6.132920163),
        (-19.575, 18.75, -5.132920163),
        (-20.425, -18.75, -6.132920163),
        (-20.425, -18.75, -5.132920163),
    ]]
    fillet(fillet3_edges, radius=FILLET3_R)


solid = Compound([part_2.part, body_7_2.part])
